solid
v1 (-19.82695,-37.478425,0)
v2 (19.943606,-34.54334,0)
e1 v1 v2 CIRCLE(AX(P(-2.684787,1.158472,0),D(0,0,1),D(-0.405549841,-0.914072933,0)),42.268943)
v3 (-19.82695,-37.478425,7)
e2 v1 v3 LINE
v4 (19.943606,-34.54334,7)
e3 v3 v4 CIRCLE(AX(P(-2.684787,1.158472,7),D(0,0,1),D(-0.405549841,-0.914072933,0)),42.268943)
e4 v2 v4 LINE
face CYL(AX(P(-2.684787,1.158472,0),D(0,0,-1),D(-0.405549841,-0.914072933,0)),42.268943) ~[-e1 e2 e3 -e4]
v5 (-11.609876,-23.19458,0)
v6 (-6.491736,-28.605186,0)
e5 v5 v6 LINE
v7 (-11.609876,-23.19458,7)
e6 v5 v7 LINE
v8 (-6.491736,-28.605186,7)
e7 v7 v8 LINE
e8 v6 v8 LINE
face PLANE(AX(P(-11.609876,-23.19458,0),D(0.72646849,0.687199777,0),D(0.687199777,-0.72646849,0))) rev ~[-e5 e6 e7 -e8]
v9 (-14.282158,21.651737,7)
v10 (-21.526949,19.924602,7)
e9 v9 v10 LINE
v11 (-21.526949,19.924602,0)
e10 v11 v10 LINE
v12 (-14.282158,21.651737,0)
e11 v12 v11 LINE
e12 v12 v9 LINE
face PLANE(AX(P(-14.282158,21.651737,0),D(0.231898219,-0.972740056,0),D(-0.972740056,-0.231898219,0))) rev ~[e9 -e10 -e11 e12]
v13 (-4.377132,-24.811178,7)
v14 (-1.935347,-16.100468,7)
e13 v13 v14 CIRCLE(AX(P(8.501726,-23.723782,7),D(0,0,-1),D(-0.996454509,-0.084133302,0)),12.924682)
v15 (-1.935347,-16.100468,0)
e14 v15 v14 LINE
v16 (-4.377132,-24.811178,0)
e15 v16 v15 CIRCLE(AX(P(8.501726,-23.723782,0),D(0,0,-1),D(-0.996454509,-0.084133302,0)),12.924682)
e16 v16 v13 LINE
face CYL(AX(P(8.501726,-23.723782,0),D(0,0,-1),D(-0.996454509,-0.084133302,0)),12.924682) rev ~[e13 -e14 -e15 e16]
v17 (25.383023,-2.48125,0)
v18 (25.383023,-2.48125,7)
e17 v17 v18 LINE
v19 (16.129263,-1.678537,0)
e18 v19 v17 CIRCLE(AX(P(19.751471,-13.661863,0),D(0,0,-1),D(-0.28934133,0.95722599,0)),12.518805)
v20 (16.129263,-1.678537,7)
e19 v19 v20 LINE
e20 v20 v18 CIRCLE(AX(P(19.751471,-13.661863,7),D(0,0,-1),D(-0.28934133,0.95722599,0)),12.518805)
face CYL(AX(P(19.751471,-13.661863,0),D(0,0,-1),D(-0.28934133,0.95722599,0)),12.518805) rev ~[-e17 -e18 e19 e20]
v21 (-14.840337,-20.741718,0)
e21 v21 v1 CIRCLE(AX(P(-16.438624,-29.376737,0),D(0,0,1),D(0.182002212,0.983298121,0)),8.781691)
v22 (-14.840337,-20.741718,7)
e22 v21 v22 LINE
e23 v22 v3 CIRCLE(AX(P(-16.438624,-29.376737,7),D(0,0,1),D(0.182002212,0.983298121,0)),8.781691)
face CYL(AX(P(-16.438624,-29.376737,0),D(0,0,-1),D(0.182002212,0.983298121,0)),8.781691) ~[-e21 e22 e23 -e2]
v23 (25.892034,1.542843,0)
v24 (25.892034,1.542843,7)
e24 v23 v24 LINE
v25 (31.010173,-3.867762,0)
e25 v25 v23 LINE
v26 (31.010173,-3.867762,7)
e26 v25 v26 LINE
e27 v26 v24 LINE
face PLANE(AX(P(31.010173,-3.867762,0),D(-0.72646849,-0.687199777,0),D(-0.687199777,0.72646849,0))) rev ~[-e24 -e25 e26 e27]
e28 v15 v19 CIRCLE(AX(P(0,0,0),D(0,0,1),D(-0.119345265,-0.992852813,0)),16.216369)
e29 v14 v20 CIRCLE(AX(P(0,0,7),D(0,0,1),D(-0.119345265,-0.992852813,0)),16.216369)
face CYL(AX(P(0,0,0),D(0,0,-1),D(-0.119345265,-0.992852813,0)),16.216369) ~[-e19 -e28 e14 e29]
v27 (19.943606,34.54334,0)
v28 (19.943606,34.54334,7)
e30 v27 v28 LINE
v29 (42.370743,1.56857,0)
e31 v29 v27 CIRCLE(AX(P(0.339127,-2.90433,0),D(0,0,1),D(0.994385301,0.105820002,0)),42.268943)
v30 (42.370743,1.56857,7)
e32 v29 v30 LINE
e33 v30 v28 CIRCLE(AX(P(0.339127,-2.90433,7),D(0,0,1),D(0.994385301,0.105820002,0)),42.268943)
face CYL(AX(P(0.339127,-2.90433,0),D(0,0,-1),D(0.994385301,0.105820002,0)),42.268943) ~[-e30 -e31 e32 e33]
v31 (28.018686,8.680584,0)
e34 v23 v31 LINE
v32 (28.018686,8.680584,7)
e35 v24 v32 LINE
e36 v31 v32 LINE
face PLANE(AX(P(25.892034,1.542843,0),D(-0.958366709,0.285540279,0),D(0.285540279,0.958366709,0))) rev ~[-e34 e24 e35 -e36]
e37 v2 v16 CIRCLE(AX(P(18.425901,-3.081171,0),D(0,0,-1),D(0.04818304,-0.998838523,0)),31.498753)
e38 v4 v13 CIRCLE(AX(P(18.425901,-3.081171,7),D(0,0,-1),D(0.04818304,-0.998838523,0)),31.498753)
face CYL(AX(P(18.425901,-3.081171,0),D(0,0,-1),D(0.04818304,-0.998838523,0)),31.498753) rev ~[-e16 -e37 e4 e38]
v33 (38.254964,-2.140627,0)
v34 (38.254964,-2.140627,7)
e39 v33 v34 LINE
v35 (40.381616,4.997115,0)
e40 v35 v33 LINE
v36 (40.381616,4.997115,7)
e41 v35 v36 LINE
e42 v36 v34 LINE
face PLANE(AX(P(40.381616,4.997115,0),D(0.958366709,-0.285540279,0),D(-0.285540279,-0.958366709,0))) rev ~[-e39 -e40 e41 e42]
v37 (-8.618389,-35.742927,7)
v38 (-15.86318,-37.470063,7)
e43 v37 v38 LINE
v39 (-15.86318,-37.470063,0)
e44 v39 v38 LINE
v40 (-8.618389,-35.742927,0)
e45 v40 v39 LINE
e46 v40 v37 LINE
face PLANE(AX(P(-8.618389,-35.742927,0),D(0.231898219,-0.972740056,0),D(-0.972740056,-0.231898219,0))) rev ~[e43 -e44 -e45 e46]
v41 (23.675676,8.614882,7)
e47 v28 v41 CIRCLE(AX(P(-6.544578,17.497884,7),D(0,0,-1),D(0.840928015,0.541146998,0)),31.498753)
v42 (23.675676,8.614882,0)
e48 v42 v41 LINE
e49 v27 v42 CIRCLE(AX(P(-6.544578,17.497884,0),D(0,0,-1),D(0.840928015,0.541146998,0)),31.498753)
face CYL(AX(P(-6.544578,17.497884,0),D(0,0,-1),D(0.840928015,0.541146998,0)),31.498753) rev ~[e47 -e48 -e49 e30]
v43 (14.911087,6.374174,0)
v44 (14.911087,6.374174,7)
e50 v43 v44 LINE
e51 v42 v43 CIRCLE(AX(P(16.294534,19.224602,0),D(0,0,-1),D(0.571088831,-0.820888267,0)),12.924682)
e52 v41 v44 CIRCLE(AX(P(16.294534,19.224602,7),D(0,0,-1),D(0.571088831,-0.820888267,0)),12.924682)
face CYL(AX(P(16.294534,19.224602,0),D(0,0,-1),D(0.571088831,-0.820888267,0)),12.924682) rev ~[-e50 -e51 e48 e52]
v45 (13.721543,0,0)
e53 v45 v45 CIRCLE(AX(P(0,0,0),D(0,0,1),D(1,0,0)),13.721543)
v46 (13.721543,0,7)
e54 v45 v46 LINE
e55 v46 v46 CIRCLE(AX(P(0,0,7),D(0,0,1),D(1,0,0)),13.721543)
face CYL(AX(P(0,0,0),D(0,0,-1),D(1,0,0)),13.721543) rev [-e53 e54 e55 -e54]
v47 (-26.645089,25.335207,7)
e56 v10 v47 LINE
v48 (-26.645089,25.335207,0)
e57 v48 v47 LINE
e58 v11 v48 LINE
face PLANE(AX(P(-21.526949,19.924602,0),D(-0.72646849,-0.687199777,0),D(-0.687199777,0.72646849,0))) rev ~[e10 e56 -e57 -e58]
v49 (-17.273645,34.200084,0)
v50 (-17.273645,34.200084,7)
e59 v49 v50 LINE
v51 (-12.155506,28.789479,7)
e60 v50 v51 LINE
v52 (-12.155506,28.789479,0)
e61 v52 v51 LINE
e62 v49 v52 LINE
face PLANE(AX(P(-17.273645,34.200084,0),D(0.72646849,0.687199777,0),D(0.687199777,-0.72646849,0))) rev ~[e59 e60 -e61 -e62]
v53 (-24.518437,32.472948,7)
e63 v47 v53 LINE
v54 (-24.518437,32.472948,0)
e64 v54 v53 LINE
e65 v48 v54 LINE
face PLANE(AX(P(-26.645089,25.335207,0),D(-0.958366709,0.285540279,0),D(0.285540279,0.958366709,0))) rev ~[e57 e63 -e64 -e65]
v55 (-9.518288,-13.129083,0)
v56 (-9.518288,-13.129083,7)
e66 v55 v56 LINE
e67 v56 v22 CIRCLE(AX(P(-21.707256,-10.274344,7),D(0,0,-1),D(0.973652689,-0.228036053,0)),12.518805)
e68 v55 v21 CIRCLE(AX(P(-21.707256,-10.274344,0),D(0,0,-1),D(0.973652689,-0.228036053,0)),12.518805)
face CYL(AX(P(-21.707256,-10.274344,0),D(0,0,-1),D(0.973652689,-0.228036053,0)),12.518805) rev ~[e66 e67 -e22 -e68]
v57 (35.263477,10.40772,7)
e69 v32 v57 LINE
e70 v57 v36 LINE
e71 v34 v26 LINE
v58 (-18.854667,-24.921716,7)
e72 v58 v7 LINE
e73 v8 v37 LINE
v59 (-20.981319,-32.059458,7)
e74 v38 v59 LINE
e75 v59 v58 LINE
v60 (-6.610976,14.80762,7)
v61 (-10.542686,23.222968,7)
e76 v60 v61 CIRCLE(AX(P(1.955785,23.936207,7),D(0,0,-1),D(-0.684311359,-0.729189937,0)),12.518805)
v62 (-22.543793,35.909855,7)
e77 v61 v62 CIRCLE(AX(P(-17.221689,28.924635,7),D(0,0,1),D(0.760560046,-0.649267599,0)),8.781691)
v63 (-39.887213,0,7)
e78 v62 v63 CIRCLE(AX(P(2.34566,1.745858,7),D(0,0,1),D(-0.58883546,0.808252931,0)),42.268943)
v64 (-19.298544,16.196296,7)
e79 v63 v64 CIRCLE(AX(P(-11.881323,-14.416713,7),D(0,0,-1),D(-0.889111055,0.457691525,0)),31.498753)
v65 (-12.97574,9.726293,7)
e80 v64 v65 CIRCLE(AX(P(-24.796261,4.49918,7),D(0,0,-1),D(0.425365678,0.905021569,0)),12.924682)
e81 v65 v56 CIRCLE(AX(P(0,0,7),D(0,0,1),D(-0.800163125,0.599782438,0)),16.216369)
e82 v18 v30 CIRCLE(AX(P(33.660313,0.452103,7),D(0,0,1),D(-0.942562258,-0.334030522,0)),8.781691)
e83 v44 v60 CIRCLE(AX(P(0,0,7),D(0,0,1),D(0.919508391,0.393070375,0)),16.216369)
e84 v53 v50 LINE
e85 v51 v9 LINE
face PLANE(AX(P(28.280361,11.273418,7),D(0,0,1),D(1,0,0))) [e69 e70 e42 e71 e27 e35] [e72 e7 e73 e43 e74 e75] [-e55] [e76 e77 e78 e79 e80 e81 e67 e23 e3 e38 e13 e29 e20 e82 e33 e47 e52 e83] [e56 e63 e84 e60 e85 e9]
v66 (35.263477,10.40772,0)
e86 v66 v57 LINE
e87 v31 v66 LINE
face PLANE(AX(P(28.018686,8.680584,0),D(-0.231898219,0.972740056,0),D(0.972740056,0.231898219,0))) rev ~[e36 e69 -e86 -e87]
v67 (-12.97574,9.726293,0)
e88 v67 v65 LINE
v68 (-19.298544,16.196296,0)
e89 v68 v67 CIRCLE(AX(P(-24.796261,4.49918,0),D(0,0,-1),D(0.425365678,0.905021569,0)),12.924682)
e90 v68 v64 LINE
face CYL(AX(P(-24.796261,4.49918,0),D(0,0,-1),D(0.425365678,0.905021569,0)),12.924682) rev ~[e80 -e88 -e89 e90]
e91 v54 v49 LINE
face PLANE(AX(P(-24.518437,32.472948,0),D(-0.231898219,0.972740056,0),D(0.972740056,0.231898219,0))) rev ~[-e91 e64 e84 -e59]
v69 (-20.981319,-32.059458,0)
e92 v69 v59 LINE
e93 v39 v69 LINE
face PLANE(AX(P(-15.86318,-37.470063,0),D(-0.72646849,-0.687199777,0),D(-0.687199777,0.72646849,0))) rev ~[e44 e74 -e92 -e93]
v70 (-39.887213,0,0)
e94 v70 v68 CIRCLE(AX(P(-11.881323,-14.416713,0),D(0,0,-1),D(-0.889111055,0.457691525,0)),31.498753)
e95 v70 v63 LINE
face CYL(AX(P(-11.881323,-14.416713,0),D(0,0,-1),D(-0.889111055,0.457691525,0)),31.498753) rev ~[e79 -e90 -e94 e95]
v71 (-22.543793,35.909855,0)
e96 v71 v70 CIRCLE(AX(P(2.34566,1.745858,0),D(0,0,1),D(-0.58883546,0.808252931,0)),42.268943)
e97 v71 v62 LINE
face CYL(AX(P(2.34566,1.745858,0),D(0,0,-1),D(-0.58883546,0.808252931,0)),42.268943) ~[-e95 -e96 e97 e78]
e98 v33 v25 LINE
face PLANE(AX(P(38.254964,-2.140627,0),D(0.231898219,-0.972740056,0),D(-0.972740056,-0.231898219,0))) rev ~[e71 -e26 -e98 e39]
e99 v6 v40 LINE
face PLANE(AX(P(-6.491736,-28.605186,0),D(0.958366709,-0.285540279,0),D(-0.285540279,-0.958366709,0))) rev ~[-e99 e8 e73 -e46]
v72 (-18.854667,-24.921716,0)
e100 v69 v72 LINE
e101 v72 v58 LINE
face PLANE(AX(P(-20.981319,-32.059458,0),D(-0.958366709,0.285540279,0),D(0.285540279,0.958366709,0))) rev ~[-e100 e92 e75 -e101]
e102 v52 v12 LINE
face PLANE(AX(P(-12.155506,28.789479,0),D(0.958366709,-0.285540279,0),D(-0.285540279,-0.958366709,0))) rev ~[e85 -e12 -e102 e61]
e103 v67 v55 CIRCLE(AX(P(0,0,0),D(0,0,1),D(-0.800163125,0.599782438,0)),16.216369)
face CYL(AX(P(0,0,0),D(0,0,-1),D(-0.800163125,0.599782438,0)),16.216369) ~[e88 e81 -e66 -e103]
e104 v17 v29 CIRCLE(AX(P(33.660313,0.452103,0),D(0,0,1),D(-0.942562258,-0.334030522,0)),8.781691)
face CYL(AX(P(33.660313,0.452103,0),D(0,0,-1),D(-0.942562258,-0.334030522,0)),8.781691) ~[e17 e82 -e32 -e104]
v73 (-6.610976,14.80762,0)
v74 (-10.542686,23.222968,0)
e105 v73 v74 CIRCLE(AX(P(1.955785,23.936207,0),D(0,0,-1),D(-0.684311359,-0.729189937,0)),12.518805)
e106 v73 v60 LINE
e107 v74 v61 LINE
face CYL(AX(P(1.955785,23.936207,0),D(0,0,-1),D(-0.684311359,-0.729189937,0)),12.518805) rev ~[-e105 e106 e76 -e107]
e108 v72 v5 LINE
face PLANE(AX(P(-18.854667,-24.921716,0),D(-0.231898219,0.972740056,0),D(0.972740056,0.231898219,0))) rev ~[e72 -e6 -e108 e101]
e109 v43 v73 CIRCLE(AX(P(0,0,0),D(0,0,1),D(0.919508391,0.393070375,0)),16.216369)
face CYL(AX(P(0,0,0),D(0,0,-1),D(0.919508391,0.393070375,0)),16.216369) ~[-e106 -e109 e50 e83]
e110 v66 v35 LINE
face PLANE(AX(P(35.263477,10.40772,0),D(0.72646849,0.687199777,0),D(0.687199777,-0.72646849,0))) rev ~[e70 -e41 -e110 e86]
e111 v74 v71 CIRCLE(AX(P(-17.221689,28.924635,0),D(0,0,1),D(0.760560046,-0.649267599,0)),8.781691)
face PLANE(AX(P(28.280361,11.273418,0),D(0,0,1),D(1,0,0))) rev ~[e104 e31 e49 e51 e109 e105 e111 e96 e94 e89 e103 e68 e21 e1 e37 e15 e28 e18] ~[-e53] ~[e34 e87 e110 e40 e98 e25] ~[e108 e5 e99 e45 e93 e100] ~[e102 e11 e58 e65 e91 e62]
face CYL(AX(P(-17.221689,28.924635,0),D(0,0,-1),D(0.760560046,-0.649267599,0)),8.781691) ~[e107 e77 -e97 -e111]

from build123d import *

# Parameters (mm, degrees)
F0_R     = 13.7215429526
F1_DEPTH = 7


# Not quite as in the source:
# - a feature names something its author has since deleted; it is built from what else it names


with BuildPart() as f1:
    # F0 (on Top) → F1 (new body)
    with BuildSketch(Plane.XY):
        with BuildLine():
            ThreePointArc((14.9110873094, 6.3741742194), (15.8866974997, 3.2532236753), (16.216368944, 0))
            ThreePointArc((16.216368944, 0), (16.1945778873, -0.8403979891), (16.1292632815, -1.6785373763))
            ThreePointArc((16.1292632815, -1.6785373763), (20.8333456957, -1.1898932874), (25.3830228197, -2.4812501212))
            ThreePointArc((25.3830228197, -2.4812501212), (35.6967714149, -8.0901996637), (42.370743035, 1.5685698162))
            ThreePointArc((42.370743035, 1.5685698162), (35.2903205619, 20.8670320083), (19.9436064757, 34.5433397021))
            ThreePointArc((19.9436064757, 34.5433397021), (24.6328655558, 21.9854776837), (23.6756761013, 8.6148816783))
            ThreePointArc((23.6756761013, 8.6148816783), (19.495827516, 6.702655598), (14.9110873094, 6.3741742194))
        make_face()
        Polygon((35.2634771892, 10.4077201887), (40.3816163825, 4.9971147515), (38.2549642206, -2.1406265287), (31.0101728654, -3.8677623716), (25.8920336721, 1.5428430657), (28.018685834, 8.6805843458), align=None, mode=Mode.SUBTRACT)
        with BuildLine():
            ThreePointArc((16.1292632815, -1.6785373763), (16.1945778873, -0.8403979891), (16.216368944, 0))
            ThreePointArc((16.216368944, 0), (15.8866974997, 3.2532236753), (14.9110873094, 6.3741742194))
            ThreePointArc((14.9110873094, 6.3741742194), (5.9163939381, 15.0985729292), (-6.6109756317, 14.8076204343))
            ThreePointArc((-6.6109756317, 14.8076204343), (-10.1175507485, 12.6730339138), (-12.9757404569, 9.7262932983))
            ThreePointArc((-12.9757404569, 9.7262932983), (-16.0339446866, -2.4255390154), (-9.5182876499, -13.129083058))
            ThreePointArc((-9.5182876499, -13.129083058), (-5.9163939381, -15.0985729292), (-1.9353468525, -16.1004675177))
            ThreePointArc((-1.9353468525, -16.1004675177), (10.1175507485, -12.6730339138), (16.1292632815, -1.6785373763))
        make_face()
        Circle(F0_R, mode=Mode.SUBTRACT)
        with BuildLine():
            ThreePointArc((-4.3771316667, -24.8111777947), (-3.9432437373, -20.2352096957), (-1.9353468525, -16.1004675177))
            ThreePointArc((-1.9353468525, -16.1004675177), (-5.9163939381, -15.0985729292), (-9.5182876499, -13.129083058))
            ThreePointArc((-9.5182876499, -13.129083058), (-11.4471506626, -17.4472599746), (-14.840337048, -20.7417175261))
            ThreePointArc((-14.840337048, -20.7417175261), (-24.8547041379, -26.8692110465), (-19.826950209, -37.4784247537))
            ThreePointArc((-19.826950209, -37.4784247537), (0.4262195398, -40.9958301185), (19.9436064757, -34.5433397021))
            ThreePointArc((19.9436064757, -34.5433397021), (6.7235494105, -32.3254261812), (-4.3771316667, -24.8111777947))
        make_face()
        Polygon((-8.6183885157, -35.742927166), (-15.8631798709, -37.4700630089), (-20.9813190642, -32.0594575716), (-18.8546669023, -24.9217162914), (-11.6098755471, -23.1945804485), (-6.4917363538, -28.6051858858), align=None, mode=Mode.SUBTRACT)
        with BuildLine():
            ThreePointArc((-12.9757404569, 9.7262932983), (-10.1175507485, 12.6730339138), (-6.6109756317, 14.8076204343))
            ThreePointArc((-6.6109756317, 14.8076204343), (-9.3861950332, 18.637153262), (-10.5426857718, 23.2229676473))
            ThreePointArc((-10.5426857718, 23.2229676473), (-10.8420672769, 34.9594107102), (-22.543792826, 35.9098549374))
            ThreePointArc((-22.543792826, 35.9098549374), (-35.7165401018, 20.1287981101), (-39.8872129515, 0))
            ThreePointArc((-39.8872129515, 0), (-31.3564149663, 10.3399484975), (-19.2985444346, 16.1962961164))
            ThreePointArc((-19.2985444346, 16.1962961164), (-15.5525837787, 13.5325540977), (-12.9757404569, 9.7262932983))
        make_face()
        Polygon((-24.5184365116, 32.4729482574), (-17.2736451565, 34.2000841003), (-12.1555059631, 28.789478663), (-14.282158125, 21.6517373829), (-21.5269494802, 19.92460154), (-26.6450886735, 25.3352069772), align=None, mode=Mode.SUBTRACT)
    extrude(amount=F1_DEPTH)


solid = f1.part
